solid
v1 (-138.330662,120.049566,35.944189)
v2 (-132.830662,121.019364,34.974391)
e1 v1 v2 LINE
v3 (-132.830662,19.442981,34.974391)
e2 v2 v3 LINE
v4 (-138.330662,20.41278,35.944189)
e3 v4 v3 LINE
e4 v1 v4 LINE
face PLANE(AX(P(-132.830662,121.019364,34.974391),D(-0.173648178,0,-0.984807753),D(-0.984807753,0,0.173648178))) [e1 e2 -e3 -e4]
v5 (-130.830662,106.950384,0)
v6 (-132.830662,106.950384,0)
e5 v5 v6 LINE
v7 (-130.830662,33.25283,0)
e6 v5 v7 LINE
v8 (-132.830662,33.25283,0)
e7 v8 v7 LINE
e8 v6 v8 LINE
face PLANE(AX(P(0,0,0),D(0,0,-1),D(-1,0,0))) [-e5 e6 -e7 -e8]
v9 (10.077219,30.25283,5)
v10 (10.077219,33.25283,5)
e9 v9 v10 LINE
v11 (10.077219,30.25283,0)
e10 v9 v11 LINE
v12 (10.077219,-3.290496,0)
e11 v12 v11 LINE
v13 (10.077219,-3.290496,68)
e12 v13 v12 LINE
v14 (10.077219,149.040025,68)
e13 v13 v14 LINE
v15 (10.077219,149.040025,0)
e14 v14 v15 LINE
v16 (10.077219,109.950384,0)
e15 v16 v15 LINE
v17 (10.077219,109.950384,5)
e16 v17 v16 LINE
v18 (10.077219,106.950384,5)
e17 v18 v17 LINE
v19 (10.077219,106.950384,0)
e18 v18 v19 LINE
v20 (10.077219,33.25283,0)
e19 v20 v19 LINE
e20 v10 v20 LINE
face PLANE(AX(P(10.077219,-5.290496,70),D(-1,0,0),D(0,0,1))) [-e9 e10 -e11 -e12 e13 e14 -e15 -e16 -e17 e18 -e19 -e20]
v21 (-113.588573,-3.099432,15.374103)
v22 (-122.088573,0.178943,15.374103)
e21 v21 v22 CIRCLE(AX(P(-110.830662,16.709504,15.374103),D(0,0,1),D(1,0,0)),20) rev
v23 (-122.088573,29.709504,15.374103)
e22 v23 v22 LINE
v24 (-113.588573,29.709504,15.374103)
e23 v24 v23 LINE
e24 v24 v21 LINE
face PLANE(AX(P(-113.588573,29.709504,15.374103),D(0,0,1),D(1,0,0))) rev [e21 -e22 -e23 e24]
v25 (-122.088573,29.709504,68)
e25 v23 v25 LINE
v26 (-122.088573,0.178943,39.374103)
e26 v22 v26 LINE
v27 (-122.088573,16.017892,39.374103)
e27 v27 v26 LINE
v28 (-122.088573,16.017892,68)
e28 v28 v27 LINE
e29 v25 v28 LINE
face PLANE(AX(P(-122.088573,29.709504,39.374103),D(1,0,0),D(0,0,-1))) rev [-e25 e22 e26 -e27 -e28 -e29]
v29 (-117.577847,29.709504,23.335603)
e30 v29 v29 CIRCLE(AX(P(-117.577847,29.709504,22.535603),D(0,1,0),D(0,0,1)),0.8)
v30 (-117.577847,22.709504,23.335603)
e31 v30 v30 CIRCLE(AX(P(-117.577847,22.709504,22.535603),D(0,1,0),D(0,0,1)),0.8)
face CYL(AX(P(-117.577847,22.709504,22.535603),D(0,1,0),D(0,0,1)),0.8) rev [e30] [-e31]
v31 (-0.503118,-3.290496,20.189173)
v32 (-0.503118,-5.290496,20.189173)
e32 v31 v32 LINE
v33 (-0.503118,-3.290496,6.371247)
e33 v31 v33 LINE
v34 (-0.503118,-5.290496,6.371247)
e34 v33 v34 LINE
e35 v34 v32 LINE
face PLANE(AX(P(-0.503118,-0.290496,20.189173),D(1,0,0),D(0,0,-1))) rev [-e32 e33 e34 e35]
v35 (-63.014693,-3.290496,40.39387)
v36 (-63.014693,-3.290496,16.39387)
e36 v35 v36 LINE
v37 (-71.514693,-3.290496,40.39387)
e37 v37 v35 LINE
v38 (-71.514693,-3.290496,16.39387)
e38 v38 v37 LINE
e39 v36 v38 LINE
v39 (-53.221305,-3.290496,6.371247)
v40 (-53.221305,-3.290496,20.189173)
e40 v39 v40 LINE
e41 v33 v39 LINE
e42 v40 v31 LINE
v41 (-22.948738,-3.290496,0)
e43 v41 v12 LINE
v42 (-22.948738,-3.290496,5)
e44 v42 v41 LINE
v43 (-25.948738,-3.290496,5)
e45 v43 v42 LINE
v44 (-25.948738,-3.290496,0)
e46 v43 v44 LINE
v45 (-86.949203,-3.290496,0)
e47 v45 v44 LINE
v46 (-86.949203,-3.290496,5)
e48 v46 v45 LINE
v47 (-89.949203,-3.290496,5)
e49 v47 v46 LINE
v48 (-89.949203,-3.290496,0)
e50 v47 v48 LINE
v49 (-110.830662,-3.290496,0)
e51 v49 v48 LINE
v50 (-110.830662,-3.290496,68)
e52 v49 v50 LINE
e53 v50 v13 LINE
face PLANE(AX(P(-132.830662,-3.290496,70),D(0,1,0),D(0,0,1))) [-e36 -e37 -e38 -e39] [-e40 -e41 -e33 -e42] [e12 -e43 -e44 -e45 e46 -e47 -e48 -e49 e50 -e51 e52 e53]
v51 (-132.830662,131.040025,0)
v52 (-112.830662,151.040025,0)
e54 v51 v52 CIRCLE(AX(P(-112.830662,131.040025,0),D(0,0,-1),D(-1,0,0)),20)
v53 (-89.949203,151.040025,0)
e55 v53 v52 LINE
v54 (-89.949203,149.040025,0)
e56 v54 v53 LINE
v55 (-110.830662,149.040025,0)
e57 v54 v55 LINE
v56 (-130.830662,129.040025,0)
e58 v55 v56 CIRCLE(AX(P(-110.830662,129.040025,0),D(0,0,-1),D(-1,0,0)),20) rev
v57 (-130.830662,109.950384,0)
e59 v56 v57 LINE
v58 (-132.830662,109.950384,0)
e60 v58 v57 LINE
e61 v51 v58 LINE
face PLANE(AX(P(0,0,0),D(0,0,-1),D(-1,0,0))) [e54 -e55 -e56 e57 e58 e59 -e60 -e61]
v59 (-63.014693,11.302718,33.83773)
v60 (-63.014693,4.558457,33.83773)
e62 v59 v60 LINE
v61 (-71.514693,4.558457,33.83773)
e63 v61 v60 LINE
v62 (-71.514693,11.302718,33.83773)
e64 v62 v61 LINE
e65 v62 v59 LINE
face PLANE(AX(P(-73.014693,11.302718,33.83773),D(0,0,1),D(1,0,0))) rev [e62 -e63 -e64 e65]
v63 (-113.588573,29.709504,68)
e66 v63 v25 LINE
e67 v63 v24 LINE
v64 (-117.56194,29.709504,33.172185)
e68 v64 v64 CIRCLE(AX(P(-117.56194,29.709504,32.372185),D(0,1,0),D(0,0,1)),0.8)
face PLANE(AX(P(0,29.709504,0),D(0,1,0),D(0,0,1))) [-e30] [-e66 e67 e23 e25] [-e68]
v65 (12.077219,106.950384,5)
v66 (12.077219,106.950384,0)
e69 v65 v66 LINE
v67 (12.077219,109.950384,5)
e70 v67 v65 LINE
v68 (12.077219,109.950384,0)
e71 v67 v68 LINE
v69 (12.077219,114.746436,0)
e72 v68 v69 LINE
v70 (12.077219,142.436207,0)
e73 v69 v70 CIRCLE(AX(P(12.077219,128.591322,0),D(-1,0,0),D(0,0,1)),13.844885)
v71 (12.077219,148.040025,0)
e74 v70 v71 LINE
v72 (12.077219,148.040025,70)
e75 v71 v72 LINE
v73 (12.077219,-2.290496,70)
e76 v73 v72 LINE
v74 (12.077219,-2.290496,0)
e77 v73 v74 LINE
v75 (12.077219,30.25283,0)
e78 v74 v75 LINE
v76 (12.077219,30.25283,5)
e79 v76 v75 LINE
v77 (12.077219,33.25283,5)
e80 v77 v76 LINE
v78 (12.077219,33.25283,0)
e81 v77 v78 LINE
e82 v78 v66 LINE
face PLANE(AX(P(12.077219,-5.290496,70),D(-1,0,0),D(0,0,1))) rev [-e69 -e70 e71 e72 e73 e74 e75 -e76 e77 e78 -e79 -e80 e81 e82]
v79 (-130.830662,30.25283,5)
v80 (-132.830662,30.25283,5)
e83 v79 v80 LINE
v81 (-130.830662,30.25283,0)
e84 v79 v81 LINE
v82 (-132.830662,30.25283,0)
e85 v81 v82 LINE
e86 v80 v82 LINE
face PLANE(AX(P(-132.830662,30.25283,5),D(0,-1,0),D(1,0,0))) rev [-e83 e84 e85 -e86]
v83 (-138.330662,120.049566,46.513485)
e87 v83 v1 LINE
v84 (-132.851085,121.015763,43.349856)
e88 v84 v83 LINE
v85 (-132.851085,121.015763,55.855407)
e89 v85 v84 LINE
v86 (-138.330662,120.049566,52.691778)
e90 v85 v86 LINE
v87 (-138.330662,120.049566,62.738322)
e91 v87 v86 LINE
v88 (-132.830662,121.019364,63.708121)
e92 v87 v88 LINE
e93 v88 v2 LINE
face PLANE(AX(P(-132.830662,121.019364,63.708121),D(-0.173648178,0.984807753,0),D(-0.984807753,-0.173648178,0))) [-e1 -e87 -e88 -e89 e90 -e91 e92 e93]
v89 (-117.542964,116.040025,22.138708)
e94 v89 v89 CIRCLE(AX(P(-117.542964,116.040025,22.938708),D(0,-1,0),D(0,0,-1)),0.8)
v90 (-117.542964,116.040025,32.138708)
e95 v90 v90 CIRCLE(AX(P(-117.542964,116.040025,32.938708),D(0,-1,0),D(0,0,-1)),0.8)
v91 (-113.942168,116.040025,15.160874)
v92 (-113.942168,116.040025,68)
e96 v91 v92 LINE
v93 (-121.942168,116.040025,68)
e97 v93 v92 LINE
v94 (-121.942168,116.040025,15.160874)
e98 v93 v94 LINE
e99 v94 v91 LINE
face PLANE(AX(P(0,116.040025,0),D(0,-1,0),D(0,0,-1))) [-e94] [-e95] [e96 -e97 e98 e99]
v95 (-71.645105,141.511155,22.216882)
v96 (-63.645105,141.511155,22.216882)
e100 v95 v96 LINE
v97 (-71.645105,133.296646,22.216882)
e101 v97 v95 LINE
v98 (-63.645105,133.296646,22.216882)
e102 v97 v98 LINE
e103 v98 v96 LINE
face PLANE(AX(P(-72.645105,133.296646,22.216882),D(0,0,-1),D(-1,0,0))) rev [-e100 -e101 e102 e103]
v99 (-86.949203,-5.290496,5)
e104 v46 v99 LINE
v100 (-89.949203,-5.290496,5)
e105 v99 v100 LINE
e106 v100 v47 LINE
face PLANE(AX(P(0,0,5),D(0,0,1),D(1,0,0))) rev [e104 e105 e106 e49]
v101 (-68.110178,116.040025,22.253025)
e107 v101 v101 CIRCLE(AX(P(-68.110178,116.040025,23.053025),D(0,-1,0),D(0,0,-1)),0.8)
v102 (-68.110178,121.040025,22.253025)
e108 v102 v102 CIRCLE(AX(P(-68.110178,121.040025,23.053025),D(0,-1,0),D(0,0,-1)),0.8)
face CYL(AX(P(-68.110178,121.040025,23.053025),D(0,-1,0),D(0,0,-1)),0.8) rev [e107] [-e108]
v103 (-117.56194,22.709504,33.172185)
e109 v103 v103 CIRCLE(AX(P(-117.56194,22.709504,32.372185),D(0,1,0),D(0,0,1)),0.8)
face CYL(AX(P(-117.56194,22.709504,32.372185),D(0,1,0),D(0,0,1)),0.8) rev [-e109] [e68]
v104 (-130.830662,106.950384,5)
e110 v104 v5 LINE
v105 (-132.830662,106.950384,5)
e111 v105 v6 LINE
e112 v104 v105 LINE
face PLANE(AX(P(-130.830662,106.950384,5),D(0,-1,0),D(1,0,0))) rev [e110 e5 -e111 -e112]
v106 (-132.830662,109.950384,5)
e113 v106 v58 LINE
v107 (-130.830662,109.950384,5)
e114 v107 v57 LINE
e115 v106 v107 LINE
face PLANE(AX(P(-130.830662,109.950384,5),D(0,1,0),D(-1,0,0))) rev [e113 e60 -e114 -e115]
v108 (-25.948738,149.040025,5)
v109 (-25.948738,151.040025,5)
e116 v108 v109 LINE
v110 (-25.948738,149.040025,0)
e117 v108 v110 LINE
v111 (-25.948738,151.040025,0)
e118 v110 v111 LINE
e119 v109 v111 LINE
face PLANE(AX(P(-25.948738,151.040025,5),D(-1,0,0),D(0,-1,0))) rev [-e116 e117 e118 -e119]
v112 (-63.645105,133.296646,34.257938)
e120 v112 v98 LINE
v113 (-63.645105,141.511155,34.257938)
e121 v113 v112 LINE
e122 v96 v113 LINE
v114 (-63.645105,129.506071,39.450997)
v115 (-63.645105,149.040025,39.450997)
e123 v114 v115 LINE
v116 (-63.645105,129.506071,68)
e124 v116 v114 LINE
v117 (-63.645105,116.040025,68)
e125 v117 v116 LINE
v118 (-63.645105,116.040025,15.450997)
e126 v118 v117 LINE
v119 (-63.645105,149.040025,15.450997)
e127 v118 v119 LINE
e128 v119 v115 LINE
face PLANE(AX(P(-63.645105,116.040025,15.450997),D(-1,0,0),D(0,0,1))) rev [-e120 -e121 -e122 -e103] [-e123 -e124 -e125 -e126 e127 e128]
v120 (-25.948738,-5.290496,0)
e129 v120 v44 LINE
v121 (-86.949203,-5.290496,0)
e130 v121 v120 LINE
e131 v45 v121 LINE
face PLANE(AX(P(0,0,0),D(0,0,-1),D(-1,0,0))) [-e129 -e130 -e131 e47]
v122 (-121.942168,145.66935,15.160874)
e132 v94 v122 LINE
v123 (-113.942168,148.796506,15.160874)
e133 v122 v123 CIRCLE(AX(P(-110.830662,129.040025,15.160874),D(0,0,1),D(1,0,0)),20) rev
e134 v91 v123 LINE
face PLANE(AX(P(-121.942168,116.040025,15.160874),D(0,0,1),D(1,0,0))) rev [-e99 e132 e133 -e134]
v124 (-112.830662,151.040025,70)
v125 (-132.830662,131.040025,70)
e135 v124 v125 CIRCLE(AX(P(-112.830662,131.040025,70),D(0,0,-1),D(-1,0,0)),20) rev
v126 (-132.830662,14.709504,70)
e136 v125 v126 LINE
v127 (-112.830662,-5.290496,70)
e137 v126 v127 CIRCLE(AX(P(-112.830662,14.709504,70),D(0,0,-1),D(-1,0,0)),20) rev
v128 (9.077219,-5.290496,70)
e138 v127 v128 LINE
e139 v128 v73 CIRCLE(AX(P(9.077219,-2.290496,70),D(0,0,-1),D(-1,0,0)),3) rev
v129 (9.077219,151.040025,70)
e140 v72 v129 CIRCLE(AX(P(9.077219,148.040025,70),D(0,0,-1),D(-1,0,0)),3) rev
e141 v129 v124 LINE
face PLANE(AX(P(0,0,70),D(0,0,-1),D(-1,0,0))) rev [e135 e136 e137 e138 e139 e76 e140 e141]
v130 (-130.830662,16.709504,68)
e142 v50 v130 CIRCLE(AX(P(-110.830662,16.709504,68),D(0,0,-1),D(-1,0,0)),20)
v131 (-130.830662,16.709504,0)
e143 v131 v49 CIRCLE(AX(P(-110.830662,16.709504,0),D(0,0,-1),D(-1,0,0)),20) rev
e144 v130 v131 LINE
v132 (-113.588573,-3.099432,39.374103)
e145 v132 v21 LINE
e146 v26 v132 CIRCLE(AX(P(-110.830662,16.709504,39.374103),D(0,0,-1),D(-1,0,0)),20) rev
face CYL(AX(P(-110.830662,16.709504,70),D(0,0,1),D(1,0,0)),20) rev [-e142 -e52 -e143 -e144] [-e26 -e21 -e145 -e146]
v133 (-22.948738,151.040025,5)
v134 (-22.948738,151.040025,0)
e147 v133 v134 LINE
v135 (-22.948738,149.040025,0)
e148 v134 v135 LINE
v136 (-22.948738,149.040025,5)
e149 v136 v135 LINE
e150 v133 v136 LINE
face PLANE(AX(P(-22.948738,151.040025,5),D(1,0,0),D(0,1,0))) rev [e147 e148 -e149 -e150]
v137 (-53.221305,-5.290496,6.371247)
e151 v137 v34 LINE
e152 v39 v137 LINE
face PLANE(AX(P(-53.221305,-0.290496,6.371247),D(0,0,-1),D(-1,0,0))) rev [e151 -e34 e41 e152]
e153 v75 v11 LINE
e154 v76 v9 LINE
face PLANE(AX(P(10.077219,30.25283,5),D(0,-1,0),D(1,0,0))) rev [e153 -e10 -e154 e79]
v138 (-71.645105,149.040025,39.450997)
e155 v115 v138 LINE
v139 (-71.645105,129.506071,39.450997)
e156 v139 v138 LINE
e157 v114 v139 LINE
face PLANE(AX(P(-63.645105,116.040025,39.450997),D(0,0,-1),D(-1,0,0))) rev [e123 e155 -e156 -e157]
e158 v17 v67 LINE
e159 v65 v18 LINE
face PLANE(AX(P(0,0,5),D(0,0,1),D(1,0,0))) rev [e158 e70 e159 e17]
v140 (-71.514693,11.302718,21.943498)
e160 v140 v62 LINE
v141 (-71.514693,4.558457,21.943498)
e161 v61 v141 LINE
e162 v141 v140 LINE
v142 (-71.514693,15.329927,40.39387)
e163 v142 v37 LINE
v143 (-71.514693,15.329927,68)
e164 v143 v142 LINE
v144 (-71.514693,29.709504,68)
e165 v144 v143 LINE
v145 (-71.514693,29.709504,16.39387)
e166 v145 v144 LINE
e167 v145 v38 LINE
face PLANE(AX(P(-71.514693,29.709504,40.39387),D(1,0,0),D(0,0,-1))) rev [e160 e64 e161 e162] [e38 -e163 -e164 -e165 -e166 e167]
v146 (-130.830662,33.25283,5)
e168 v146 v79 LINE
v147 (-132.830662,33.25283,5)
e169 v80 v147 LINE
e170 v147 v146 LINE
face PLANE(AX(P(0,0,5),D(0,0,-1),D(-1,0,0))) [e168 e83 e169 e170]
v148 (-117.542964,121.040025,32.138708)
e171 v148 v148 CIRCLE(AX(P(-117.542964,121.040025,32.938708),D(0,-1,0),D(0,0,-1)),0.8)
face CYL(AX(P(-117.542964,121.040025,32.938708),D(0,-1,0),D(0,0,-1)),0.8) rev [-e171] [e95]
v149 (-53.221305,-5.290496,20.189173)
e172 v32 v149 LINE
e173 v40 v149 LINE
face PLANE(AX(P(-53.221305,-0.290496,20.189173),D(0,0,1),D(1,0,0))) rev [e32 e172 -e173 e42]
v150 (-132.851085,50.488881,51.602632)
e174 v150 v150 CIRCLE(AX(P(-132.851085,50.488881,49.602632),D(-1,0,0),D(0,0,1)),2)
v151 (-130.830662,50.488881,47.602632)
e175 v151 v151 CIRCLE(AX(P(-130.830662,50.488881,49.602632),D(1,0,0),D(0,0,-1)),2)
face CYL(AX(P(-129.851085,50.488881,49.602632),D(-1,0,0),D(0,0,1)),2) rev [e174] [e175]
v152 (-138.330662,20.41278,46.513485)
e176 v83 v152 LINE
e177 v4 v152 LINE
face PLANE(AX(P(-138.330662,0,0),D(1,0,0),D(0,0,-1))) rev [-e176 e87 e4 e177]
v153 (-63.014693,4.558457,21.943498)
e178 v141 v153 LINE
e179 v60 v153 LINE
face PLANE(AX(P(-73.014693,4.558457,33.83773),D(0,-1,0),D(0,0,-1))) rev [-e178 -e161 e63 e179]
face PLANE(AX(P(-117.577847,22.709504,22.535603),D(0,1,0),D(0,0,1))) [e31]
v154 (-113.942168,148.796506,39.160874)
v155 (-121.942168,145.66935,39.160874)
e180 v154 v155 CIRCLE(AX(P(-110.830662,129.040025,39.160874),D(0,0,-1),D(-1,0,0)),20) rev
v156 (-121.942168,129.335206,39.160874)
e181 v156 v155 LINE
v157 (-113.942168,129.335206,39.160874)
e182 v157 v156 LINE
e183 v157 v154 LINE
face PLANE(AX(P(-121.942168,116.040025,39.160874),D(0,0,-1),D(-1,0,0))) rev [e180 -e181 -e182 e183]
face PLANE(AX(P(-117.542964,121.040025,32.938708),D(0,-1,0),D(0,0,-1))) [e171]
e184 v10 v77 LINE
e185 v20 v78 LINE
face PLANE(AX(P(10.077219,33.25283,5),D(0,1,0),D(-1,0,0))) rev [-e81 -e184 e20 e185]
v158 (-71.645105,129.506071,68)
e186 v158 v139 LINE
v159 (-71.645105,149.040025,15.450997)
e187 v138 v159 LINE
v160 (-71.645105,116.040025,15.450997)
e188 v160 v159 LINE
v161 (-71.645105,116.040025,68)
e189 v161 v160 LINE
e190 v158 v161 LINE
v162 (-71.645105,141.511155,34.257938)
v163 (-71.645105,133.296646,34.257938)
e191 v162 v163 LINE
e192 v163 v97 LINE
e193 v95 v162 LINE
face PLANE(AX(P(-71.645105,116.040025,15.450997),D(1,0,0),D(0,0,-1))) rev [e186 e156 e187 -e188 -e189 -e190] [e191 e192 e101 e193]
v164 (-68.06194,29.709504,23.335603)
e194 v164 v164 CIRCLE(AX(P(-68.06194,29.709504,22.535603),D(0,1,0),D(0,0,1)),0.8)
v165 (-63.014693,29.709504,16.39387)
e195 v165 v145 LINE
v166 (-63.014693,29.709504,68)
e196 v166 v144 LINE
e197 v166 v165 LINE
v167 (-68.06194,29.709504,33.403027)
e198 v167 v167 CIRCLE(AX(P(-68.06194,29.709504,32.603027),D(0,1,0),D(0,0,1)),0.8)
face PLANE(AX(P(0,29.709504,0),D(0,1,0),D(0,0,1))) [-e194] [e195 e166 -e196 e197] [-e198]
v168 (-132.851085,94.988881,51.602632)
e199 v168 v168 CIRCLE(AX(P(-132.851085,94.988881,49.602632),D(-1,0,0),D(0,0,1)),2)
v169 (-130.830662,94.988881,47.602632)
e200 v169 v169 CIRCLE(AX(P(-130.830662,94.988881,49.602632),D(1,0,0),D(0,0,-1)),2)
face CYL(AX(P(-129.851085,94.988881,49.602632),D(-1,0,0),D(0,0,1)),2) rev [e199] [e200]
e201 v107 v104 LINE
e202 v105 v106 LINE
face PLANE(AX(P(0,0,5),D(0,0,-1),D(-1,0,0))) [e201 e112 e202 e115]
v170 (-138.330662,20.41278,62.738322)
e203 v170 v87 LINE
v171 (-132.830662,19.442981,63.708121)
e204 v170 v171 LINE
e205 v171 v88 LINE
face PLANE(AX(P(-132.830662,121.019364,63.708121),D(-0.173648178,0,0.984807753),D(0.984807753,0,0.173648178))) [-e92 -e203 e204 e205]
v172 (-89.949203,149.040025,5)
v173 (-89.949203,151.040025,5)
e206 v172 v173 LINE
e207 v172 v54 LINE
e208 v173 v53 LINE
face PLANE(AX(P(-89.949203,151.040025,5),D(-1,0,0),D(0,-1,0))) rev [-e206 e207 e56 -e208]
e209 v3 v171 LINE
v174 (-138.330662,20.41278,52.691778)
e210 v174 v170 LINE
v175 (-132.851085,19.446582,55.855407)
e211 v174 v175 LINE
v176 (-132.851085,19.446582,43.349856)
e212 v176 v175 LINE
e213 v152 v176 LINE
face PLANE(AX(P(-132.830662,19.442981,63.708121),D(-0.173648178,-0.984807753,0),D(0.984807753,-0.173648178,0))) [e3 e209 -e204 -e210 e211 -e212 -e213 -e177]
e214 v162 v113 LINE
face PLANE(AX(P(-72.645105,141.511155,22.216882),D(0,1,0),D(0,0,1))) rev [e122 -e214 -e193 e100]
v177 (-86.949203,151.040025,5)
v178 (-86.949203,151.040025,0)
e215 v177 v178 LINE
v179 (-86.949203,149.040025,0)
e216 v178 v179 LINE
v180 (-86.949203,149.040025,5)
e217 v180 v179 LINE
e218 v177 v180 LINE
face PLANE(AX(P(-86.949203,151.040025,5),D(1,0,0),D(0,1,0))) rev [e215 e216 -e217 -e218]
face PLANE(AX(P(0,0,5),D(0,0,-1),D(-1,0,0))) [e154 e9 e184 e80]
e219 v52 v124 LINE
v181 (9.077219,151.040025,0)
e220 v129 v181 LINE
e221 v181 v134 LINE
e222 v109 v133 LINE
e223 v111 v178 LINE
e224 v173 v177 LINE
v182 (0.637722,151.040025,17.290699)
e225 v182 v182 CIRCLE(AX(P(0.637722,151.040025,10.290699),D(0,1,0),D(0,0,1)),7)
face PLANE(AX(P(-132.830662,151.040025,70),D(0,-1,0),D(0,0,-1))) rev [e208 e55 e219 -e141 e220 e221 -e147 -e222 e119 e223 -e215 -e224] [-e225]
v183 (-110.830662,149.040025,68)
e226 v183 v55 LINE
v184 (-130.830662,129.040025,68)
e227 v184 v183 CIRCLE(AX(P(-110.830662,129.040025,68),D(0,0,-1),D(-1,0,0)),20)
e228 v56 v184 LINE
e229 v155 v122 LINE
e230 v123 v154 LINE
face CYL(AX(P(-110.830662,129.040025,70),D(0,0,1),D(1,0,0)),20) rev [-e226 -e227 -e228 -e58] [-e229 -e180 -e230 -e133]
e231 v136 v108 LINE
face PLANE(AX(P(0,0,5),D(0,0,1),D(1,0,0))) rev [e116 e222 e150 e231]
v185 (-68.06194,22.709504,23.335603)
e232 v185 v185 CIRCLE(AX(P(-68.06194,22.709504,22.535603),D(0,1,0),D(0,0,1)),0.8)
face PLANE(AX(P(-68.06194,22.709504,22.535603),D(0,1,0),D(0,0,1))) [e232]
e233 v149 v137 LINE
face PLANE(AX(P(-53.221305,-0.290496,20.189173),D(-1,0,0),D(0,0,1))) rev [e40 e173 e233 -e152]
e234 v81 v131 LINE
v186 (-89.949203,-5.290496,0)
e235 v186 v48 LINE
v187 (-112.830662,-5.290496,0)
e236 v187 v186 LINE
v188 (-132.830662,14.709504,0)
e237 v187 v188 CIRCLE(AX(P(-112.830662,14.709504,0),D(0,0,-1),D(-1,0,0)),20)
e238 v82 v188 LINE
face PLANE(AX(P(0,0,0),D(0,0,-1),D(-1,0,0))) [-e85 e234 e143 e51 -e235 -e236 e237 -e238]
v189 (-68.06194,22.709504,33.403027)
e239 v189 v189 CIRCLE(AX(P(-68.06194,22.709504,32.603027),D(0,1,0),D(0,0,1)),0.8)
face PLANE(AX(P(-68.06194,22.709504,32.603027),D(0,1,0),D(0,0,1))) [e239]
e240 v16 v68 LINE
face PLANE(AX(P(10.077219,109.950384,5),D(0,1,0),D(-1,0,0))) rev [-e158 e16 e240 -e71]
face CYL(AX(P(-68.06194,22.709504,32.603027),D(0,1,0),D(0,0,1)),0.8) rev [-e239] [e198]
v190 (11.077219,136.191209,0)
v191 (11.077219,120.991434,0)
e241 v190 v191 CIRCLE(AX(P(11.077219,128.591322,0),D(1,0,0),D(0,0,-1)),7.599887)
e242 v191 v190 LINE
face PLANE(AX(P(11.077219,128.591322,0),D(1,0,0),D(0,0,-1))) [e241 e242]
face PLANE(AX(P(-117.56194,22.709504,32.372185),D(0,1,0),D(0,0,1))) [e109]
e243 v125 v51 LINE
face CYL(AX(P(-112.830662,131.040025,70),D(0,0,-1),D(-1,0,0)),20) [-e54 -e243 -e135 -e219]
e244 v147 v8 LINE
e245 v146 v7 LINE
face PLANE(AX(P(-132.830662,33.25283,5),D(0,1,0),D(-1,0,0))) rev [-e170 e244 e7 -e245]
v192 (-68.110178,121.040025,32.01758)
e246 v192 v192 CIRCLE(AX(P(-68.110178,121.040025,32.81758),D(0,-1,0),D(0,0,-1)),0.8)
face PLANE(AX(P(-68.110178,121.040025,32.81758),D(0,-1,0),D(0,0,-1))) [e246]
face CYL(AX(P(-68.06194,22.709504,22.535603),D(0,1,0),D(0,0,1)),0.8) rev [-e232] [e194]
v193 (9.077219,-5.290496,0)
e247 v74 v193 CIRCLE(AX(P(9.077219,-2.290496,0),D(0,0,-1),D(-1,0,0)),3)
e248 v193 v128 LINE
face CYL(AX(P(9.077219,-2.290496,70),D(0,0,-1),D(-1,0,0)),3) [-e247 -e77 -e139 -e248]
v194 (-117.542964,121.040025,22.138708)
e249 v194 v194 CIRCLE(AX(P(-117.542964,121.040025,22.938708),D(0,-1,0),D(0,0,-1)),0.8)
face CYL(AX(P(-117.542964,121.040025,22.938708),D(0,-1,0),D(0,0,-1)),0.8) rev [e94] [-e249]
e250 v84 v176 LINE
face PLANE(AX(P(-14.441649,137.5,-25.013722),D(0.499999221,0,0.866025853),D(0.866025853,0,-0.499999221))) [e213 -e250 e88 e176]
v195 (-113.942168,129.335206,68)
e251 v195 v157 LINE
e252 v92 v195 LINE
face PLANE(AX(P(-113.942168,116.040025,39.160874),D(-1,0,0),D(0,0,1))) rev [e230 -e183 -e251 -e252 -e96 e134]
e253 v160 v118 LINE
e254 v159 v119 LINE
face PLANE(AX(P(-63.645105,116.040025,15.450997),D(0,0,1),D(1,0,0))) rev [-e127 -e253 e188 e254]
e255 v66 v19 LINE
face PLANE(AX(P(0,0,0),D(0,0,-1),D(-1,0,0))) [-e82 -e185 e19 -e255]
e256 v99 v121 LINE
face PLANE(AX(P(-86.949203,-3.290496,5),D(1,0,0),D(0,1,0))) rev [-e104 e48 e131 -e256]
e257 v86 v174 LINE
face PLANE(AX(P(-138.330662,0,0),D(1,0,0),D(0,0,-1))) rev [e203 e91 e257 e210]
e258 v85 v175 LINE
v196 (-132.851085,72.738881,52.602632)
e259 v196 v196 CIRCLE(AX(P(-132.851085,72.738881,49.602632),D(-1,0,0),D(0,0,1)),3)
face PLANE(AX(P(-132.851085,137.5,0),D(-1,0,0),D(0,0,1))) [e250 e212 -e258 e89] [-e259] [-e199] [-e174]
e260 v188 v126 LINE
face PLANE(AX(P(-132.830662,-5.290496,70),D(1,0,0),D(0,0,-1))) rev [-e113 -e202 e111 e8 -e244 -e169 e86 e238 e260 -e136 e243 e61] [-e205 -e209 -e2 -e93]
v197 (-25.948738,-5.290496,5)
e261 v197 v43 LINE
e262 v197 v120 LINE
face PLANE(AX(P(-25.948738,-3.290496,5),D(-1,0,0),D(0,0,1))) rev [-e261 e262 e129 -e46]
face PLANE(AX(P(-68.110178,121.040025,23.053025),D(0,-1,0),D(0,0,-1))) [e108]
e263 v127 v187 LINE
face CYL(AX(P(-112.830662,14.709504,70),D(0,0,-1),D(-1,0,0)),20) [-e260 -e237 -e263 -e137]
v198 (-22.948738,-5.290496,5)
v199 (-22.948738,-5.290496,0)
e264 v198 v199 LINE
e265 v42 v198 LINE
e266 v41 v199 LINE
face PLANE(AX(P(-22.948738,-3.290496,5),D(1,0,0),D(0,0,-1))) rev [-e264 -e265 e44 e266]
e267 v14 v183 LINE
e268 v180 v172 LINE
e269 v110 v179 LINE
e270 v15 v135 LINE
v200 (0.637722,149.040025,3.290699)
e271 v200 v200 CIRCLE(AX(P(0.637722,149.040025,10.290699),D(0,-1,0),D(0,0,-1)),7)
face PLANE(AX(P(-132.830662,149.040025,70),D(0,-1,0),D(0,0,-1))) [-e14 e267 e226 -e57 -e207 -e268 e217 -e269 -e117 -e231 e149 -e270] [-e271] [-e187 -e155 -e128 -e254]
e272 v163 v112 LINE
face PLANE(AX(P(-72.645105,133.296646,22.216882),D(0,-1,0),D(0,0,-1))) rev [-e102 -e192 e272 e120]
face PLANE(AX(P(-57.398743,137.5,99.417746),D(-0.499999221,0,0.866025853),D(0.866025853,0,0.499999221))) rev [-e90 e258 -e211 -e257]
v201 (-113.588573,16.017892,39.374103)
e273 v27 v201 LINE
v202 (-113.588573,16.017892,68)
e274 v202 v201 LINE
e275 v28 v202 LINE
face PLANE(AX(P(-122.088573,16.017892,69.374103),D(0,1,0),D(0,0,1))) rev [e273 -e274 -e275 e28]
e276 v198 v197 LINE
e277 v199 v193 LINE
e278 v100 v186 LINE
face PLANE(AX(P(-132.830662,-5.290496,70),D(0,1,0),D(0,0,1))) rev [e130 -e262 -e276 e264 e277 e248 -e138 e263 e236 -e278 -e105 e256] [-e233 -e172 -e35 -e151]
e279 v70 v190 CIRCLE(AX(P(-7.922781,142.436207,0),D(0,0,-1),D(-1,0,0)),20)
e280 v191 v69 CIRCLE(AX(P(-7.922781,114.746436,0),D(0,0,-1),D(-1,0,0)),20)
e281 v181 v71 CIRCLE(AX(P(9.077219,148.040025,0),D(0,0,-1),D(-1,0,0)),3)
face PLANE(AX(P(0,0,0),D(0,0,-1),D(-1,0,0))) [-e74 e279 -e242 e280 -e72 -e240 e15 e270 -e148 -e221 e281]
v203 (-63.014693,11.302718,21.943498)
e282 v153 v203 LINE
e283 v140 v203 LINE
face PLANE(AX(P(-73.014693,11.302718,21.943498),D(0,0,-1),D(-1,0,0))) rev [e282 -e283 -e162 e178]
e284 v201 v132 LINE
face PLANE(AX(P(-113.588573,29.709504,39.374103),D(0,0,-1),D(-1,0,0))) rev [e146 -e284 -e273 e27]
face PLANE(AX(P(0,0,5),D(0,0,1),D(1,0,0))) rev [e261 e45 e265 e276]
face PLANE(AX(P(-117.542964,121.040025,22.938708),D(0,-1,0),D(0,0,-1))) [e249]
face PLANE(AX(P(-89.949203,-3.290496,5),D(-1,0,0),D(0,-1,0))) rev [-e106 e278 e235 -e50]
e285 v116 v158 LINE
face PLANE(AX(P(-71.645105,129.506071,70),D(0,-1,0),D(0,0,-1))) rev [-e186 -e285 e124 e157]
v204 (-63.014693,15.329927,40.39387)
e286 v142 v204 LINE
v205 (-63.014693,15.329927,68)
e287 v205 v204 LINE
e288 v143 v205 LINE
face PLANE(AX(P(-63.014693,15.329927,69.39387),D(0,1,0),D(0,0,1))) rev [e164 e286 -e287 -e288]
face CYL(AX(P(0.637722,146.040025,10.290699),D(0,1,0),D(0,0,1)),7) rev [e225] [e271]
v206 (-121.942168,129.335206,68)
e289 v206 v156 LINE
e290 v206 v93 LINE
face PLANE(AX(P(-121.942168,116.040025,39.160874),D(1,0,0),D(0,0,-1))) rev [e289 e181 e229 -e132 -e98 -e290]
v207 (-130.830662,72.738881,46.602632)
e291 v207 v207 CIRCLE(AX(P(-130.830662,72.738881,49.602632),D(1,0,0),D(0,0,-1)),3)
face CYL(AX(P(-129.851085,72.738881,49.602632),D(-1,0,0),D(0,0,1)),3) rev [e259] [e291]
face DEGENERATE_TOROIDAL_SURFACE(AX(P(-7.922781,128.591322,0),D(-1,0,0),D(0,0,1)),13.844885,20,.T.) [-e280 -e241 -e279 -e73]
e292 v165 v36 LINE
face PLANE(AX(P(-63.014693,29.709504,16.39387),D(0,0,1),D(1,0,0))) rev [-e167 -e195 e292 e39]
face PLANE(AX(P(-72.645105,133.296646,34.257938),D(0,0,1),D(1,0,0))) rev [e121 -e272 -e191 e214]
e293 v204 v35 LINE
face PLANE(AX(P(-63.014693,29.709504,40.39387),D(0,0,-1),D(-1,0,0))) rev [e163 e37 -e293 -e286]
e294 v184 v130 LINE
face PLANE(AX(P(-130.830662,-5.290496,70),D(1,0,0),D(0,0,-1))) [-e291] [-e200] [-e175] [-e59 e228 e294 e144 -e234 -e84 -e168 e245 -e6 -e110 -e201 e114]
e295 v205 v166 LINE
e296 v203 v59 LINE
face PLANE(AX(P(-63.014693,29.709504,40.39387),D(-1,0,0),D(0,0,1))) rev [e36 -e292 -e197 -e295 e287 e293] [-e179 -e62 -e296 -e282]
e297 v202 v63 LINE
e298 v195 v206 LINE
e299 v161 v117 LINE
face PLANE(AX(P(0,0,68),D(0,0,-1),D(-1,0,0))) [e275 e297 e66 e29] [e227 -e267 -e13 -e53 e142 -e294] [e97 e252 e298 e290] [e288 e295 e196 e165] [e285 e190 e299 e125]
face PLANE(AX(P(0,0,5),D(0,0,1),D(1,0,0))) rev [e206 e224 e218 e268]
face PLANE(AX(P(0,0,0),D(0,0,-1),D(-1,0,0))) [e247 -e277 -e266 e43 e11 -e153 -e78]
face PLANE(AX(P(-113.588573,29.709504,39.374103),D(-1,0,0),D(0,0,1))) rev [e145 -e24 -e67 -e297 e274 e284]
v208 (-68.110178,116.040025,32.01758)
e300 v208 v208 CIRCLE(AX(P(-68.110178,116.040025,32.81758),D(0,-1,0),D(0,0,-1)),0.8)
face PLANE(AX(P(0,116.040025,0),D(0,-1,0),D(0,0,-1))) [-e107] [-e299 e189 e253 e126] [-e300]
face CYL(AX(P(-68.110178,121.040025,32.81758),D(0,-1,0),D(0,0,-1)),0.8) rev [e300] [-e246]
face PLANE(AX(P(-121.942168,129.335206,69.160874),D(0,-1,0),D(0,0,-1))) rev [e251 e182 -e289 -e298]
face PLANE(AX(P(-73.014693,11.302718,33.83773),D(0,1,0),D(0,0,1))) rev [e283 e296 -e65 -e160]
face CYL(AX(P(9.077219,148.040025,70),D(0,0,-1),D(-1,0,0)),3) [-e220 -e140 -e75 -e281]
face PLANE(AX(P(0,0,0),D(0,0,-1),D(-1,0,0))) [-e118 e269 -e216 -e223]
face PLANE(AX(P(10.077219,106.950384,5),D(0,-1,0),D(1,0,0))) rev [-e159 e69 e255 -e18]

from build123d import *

# Parameters (mm, degrees)
ESQUISSE2_W              = 144.907881123
ESQUISSE2_H              = 156.330521118
BOSS_EXTRU_1_DEPTH       = 70
COQUE1_T                 = -2
ESQUISSE14_W             = 28.733729995
ESQUISSE14_H             = 101.576382864
BOSS_EXTRU_7_DEPTH       = 5.5
BOSS_EXTRU_7_TAPER       = 10
ENL_V_MAT_EXTRU_5_DEPTH  = 137.5
ESQUISSE16_R             = 3
ENL_V_MAT_EXTRU_6_DEPTH  = 3
ESQUISSE17_W             = 8
ESQUISSE17_H             = 24
BOSS_EXTRU_8_DEPTH       = 33
ESQUISSE18_W             = 12.041056231
ESQUISSE18_H             = 8.214509438
ENL_V_MAT_EXTRU_7_DEPTH  = 9
ESQUISSE19_R             = 0.8
ENL_V_MAT_EXTRU_8_DEPTH  = 5
ESQUISSE20_W             = 8.5
ESQUISSE20_H             = 24
BOSS_EXTRU_9_DEPTH       = 33
ESQUISSE22_W             = 11.894232579
ESQUISSE22_H             = 6.744261383
ENL_V_MAT_EXTRU_9_DEPTH  = 10
ESQUISSE25_W             = 8
ESQUISSE25_H             = 13.466046283
BOSS_EXTRU_10_DEPTH      = 30.549003
ESQUISSE26_W             = 8
ESQUISSE26_H             = 13.295181457
BOSS_EXTRU_11_DEPTH      = 30
ESQUISSE27_W             = 8.5
ESQUISSE27_H             = 13.691611871
BOSS_EXTRU_12_DEPTH      = 30
ESQUISSE28_W             = 8.5
ESQUISSE28_H             = 14.379576359
BOSS_EXTRU_14_DEPTH      = 29
ESQUISSE29_R             = 7
ENL_V_MAT_EXTRU_11_DEPTH = 5
ESQUISSE30_W             = 52.718186521
ESQUISSE30_H             = 13.817926224
ENL_V_MAT_EXTRU_12_DEPTH = 5
CONG_4_R                 = 20
CONG_5_R                 = 3
ENL_V_MAT_EXTRU_13_DEPTH = 1
CONG_6_R                 = 20
ESQUISSE21_R             = 0.8
ENL_V_MAT_EXTRU_14_DEPTH = 7
ESQUISSE34_W             = 2
ESQUISSE34_H             = 3
ESQUISSE34_W_2           = 3
ESQUISSE34_H_2           = 2
ENL_V_MAT_EXTRU_15_DEPTH = 5


with BuildPart() as part:
    # Esquisse2 → Boss.-Extru.1 (new body)
    with BuildSketch(Plane.XY):
        with Locations((-60.376721844, 72.874764276)):
            Rectangle(ESQUISSE2_W, ESQUISSE2_H)
    extrude(amount=BOSS_EXTRU_1_DEPTH)

    # Coque1
    coque1_openings = [part.faces().sort_by_distance(p)[0] for p in [
        (-60.376721844, 72.874764276, 0),
    ]]
    offset(amount=COQUE1_T, openings=coque1_openings, kind=Kind.INTERSECTION)

    # Esquisse14 → Boss.-Extru.7 (add)
    with BuildSketch(Plane.ZY.offset(132.830662405)):
        with Locations((49.34125564, 70.231172893)):
            Rectangle(ESQUISSE14_W, ESQUISSE14_H)
    extrude(amount=BOSS_EXTRU_7_DEPTH, taper=BOSS_EXTRU_7_TAPER)

    # Troue matien spirobs → Enlèv. mat.-Extru.5 (cut)
    # profile 1 of 2: a face of its own
    with BuildSketch(Plane(origin=(0, 0, 0), x_dir=(1, 0, 0), z_dir=(0, 1, 0))):
        Polygon((-132.851084635, -55.85540738), (-138.851094768, -52.391307109), (-138.851094768, -46.813956352), (-132.851084635, -43.34985608), align=None)
        Polygon((-133.351084635, -54.989382875), (-138.351094768, -52.102631674), (-138.351094768, -47.102631786), (-133.351084635, -44.215880585), align=None, mode=Mode.SUBTRACT)
    # profile 2 of 2: a face of its own
    with BuildSketch(Plane(origin=(0, 0, 0), x_dir=(1, 0, 0), z_dir=(0, 1, 0))):
        Polygon((-138.351094768, -52.102631674), (-138.351094768, -47.102631786), (-133.351084635, -44.215880585), (-133.351084635, -54.989382875), align=None)
    extrude(amount=ENL_V_MAT_EXTRU_5_DEPTH, mode=Mode.SUBTRACT)

    # Esquisse16 → Enlèv. mat.-Extru.6 (cut)
    with BuildSketch(Plane.ZY.offset(132.851084635)):
        with BuildLine():
            ThreePointArc((51.60263173, 94.988881377), (51.016845292, 96.403094939), (49.60263173, 96.988881377))
            Line((49.60263173, 96.988881377), (49.60263173, 92.988881377))
            ThreePointArc((49.60263173, 92.988881377), (51.016845292, 93.574667814), (51.60263173, 94.988881377))
        make_face()
        with BuildLine():
            Line((49.60263173, 92.988881377), (49.60263173, 96.988881377))
            ThreePointArc((49.60263173, 96.988881377), (47.60263173, 94.988881377), (49.60263173, 92.988881377))
        make_face()
        with BuildLine():
            ThreePointArc((51.60263173, 50.488881377), (51.016845292, 51.903094939), (49.60263173, 52.488881377))
            Line((49.60263173, 52.488881377), (49.60263173, 48.488881377))
            ThreePointArc((49.60263173, 48.488881377), (51.016845292, 49.074667814), (51.60263173, 50.488881377))
        make_face()
        with BuildLine():
            Line((49.60263173, 48.488881377), (49.60263173, 52.488881377))
            ThreePointArc((49.60263173, 52.488881377), (47.60263173, 50.488881377), (49.60263173, 48.488881377))
        make_face()
        with Locations((49.60263173, 72.738881377)):
            Circle(ESQUISSE16_R)
    extrude(amount=-ENL_V_MAT_EXTRU_6_DEPTH, mode=Mode.SUBTRACT)

    # Esquisse17 → Boss.-Extru.8 (add)
    with BuildSketch(Plane.XZ.offset(-149.040024835)):
        with Locations((-67.645104732, 27.450996733)):
            Rectangle(ESQUISSE17_W, ESQUISSE17_H)
        with Locations((-117.942168048, 27.160873918)):
            Rectangle(ESQUISSE17_W, ESQUISSE17_H)
    extrude(amount=BOSS_EXTRU_8_DEPTH)

    # Esquisse18 → Enlèv. mat.-Extru.7 (cut)
    with BuildSketch(Plane(origin=(-63.645104732, 0, 0), x_dir=(0, 0, -1), z_dir=(1, 0, 0))):
        with Locations((-28.237409826, 137.403900729)):
            Rectangle(ESQUISSE18_W, ESQUISSE18_H)
    extrude(amount=-ENL_V_MAT_EXTRU_7_DEPTH, mode=Mode.SUBTRACT)

    # Esquisse19 → Enlèv. mat.-Extru.8 (cut)
    with BuildSketch(Plane.XZ.offset(-116.040024835)):
        with Locations(Location((-68.110177619, 23.053024635, 0), (0, 0, 270))):
            Circle(ESQUISSE19_R)
        with Locations(Location((-68.110177619, 32.817579673, 0), (0, 0, 270))):
            Circle(ESQUISSE19_R)
        with Locations(Location((-117.542963794, 32.93870849, 0), (0, 0, 270))):
            Circle(ESQUISSE19_R)
        with Locations(Location((-117.542963794, 22.93870849, 0), (0, 0, 270))):
            Circle(ESQUISSE19_R)
    extrude(amount=-ENL_V_MAT_EXTRU_8_DEPTH, mode=Mode.SUBTRACT)

    # Esquisse20 → Boss.-Extru.9 (add)
    with BuildSketch(Plane(origin=(0, -3.290496283, 0), x_dir=(1, 0, 0), z_dir=(0, 1, 0))):
        with Locations((-117.838572927, -27.374102793)):
            Rectangle(ESQUISSE20_W, ESQUISSE20_H)
        with Locations((-67.264692574, -28.393869792)):
            Rectangle(ESQUISSE20_W, ESQUISSE20_H)
    extrude(amount=BOSS_EXTRU_9_DEPTH)

    # Esquisse22 → Enlèv. mat.-Extru.9 (cut)
    with BuildSketch(Plane(origin=(-63.014692574, 0, 0), x_dir=(0, 0, -1), z_dir=(1, 0, 0))):
        with Locations((-27.890614159, 7.930587585)):
            Rectangle(ESQUISSE22_W, ESQUISSE22_H)
    extrude(amount=-ENL_V_MAT_EXTRU_9_DEPTH, mode=Mode.SUBTRACT)

    # Esquisse25 → Boss.-Extru.10 (add)
    with BuildSketch(Plane.XY.offset(39.450996733)):
        with Locations((-67.645104732, 122.773047977)):
            Rectangle(ESQUISSE25_W, ESQUISSE25_H)
    extrude(amount=BOSS_EXTRU_10_DEPTH)

    # Esquisse26 → Boss.-Extru.11 (add)
    with BuildSketch(Plane.XY.offset(39.160873918)):
        with Locations((-117.942168048, 122.687615564)):
            Rectangle(ESQUISSE26_W, ESQUISSE26_H)
    extrude(amount=BOSS_EXTRU_11_DEPTH)

    # Esquisse27 → Boss.-Extru.12 (add)
    with BuildSketch(Plane.XY.offset(39.374102793)):
        with Locations((-117.838572927, 22.863697782)):
            Rectangle(ESQUISSE27_W, ESQUISSE27_H)
    extrude(amount=BOSS_EXTRU_12_DEPTH)

    # Esquisse28 → Boss.-Extru.14 (add)
    with BuildSketch(Plane.XY.offset(40.393869792)):
        with Locations((-67.264692574, 22.519715538)):
            Rectangle(ESQUISSE28_W, ESQUISSE28_H)
    extrude(amount=BOSS_EXTRU_14_DEPTH)

    # Esquisse29 → Enlèv. mat.-Extru.11 (cut)
    with BuildSketch(Plane(origin=(0, 151.040024835, 0), x_dir=(1, 0, 0), z_dir=(0, 1, 0))):
        with Locations(Location((0.637722391, -10.29069879, 0), (0, 0, 270))):
            Circle(ESQUISSE29_R)
    extrude(amount=-ENL_V_MAT_EXTRU_11_DEPTH, mode=Mode.SUBTRACT)

    # Esquisse30 → Enlèv. mat.-Extru.12 (cut)
    with BuildSketch(Plane.XZ.offset(5.290496283)):
        with Locations((-26.862211313, 13.280210157)):
            Rectangle(ESQUISSE30_W, ESQUISSE30_H)
    extrude(amount=-ENL_V_MAT_EXTRU_12_DEPTH, mode=Mode.SUBTRACT)

    # Congé4
    # the kernel refuses this fillet: 20 mm, written as the material it adds along each edge
    with BuildSketch(Plane(origin=(-130.830662405, 149.040024835, 0), x_dir=(1, 0, 0), z_dir=(0, 0, 1))) as cong_4_piece_1:
        with BuildLine():
            CenterArc((CONG_4_R, -CONG_4_R), CONG_4_R, 90, 90)
            Line((0, -CONG_4_R), (0, 0))
            Line((0, 0), (CONG_4_R, 0))
        make_face()
    extrude(amount=68)
    with BuildSketch(Plane(origin=(-130.830662405, -3.290496283, 68), x_dir=(0, 1, 0), z_dir=(0, 0, -1))) as cong_4_piece_2:
        with BuildLine():
            CenterArc((CONG_4_R, CONG_4_R), CONG_4_R, 180, 90)
            Line((0, CONG_4_R), (0, 0))
            Line((0, 0), (CONG_4_R, 0))
        make_face()
    extrude(amount=68)
    # the kernel refuses this fillet: 20 mm, written as the material it takes off along each edge
    with BuildSketch(Plane(origin=(-132.830662405, -5.290496283, -50), x_dir=(0, 1, 0), z_dir=(0, 0, 1)), Plane(origin=(-132.830662405, 151.040024835, -50), x_dir=(1, 0, 0), z_dir=(0, 0, 1))) as cong_4_2_piece_1:
        with BuildLine():
            CenterArc((CONG_4_R, -CONG_4_R), CONG_4_R, 90, 90)
            Line((0, -CONG_4_R), (0, 0))
            Line((0, 0), (CONG_4_R, 0))
        make_face()
    extrude(amount=170, mode=Mode.SUBTRACT)

    # Congé5
    cong_5_edges = [part.edges().sort_by_distance(p)[0] for p in [
        (12.077218718, -5.290496283, 35),
        (12.077218718, 151.040024835, 35),
    ]]
    fillet(cong_5_edges, radius=CONG_5_R)

    # Esquisse31 → Enlèv. mat.-Extru.13 (cut)
    with BuildSketch(Plane(origin=(12.077218718, 0, 0), x_dir=(0, 0, -1), z_dir=(1, 0, 0))):
        with BuildLine():
            Line((0, 120.991434469), (0, 136.191208624))
            ThreePointArc((0, 136.191208624), (-7.599887078, 128.591321546), (0, 120.991434469))
        make_face()
    extrude(amount=-ENL_V_MAT_EXTRU_13_DEPTH, mode=Mode.SUBTRACT)

    # Congé6
    # the kernel refuses this fillet: 20 mm, written as the material it takes off along each edge
    with BuildSketch(Plane(origin=(12.077218718, 128.591321546, 0), x_dir=(0, 0.003141587485881077, -0.9999950652018582), z_dir=(0, -0.9999950652018582, -0.003141587485881077))) as cong_6_piece_1:
        with BuildLine():
            CenterArc((13.844885076, -20), CONG_6_R, 90, 18.194872339)
            Line((7.599887078, -1), (7.474987118, -0.62))
            ThreePointArc((7.474987118, -0.62), (7.199887078, -0.5), (7.199887078, 0))
            Line((7.199887078, 0), (7.599887078, 0.4))
            Line((7.599887078, 0.4), (13.844885076, 0.4))
            Line((13.844885076, 0.4), (13.844885076, 0))
        make_face()
    revolve(axis=Axis((12.077218718, 128.591321546, 0), (1, 0, 0)), revolution_arc=359.64, mode=Mode.SUBTRACT)

    # Esquisse21 → Enlèv. mat.-Extru.14 (cut)
    with BuildSketch(Plane(origin=(0, 29.709503717, 0), x_dir=(1, 0, 0), z_dir=(0, 1, 0))):
        with Locations(Location((-68.061939997, -22.535603051, 0), (0, 0, 270))):
            Circle(ESQUISSE21_R)
        with Locations(Location((-68.061939997, -32.603026975, 0), (0, 0, 270))):
            Circle(ESQUISSE21_R)
        with Locations(Location((-117.577847279, -22.535603051, 0), (0, 0, 270))):
            Circle(ESQUISSE21_R)
        with Locations(Location((-117.561939997, -32.372185179, 0), (0, 0, 270))):
            Circle(ESQUISSE21_R)
    extrude(amount=-ENL_V_MAT_EXTRU_14_DEPTH, mode=Mode.SUBTRACT)

    # Esquisse34 → Enlèv. mat.-Extru.15 (cut)
    with BuildSketch(Plane(origin=(0, 0, 0), x_dir=(-1, 0, 0), z_dir=(0, 0, -1))):
        with Locations((131.830662405, 31.752830171)):
            Rectangle(ESQUISSE34_W, ESQUISSE34_H)
        with Locations((131.830662405, 108.450383814)):
            Rectangle(ESQUISSE34_W, ESQUISSE34_H)
        with Locations((-11.077218718, 31.752830171)):
            Rectangle(ESQUISSE34_W, ESQUISSE34_H)
        with Locations((-11.077218718, 108.450383814)):
            Rectangle(ESQUISSE34_W, ESQUISSE34_H)
        with Locations((88.44920315, 150.040024835)):
            Rectangle(ESQUISSE34_W_2, ESQUISSE34_H_2)
        with Locations((24.448737585, 150.040024835)):
            Rectangle(ESQUISSE34_W_2, ESQUISSE34_H_2)
        with Locations((24.448737585, -4.290496283)):
            Rectangle(ESQUISSE34_W_2, ESQUISSE34_H_2)
        with Locations((88.44920315, -4.290496283)):
            Rectangle(ESQUISSE34_W_2, ESQUISSE34_H_2)
    extrude(amount=-ENL_V_MAT_EXTRU_15_DEPTH, mode=Mode.SUBTRACT)


solid = part.part
